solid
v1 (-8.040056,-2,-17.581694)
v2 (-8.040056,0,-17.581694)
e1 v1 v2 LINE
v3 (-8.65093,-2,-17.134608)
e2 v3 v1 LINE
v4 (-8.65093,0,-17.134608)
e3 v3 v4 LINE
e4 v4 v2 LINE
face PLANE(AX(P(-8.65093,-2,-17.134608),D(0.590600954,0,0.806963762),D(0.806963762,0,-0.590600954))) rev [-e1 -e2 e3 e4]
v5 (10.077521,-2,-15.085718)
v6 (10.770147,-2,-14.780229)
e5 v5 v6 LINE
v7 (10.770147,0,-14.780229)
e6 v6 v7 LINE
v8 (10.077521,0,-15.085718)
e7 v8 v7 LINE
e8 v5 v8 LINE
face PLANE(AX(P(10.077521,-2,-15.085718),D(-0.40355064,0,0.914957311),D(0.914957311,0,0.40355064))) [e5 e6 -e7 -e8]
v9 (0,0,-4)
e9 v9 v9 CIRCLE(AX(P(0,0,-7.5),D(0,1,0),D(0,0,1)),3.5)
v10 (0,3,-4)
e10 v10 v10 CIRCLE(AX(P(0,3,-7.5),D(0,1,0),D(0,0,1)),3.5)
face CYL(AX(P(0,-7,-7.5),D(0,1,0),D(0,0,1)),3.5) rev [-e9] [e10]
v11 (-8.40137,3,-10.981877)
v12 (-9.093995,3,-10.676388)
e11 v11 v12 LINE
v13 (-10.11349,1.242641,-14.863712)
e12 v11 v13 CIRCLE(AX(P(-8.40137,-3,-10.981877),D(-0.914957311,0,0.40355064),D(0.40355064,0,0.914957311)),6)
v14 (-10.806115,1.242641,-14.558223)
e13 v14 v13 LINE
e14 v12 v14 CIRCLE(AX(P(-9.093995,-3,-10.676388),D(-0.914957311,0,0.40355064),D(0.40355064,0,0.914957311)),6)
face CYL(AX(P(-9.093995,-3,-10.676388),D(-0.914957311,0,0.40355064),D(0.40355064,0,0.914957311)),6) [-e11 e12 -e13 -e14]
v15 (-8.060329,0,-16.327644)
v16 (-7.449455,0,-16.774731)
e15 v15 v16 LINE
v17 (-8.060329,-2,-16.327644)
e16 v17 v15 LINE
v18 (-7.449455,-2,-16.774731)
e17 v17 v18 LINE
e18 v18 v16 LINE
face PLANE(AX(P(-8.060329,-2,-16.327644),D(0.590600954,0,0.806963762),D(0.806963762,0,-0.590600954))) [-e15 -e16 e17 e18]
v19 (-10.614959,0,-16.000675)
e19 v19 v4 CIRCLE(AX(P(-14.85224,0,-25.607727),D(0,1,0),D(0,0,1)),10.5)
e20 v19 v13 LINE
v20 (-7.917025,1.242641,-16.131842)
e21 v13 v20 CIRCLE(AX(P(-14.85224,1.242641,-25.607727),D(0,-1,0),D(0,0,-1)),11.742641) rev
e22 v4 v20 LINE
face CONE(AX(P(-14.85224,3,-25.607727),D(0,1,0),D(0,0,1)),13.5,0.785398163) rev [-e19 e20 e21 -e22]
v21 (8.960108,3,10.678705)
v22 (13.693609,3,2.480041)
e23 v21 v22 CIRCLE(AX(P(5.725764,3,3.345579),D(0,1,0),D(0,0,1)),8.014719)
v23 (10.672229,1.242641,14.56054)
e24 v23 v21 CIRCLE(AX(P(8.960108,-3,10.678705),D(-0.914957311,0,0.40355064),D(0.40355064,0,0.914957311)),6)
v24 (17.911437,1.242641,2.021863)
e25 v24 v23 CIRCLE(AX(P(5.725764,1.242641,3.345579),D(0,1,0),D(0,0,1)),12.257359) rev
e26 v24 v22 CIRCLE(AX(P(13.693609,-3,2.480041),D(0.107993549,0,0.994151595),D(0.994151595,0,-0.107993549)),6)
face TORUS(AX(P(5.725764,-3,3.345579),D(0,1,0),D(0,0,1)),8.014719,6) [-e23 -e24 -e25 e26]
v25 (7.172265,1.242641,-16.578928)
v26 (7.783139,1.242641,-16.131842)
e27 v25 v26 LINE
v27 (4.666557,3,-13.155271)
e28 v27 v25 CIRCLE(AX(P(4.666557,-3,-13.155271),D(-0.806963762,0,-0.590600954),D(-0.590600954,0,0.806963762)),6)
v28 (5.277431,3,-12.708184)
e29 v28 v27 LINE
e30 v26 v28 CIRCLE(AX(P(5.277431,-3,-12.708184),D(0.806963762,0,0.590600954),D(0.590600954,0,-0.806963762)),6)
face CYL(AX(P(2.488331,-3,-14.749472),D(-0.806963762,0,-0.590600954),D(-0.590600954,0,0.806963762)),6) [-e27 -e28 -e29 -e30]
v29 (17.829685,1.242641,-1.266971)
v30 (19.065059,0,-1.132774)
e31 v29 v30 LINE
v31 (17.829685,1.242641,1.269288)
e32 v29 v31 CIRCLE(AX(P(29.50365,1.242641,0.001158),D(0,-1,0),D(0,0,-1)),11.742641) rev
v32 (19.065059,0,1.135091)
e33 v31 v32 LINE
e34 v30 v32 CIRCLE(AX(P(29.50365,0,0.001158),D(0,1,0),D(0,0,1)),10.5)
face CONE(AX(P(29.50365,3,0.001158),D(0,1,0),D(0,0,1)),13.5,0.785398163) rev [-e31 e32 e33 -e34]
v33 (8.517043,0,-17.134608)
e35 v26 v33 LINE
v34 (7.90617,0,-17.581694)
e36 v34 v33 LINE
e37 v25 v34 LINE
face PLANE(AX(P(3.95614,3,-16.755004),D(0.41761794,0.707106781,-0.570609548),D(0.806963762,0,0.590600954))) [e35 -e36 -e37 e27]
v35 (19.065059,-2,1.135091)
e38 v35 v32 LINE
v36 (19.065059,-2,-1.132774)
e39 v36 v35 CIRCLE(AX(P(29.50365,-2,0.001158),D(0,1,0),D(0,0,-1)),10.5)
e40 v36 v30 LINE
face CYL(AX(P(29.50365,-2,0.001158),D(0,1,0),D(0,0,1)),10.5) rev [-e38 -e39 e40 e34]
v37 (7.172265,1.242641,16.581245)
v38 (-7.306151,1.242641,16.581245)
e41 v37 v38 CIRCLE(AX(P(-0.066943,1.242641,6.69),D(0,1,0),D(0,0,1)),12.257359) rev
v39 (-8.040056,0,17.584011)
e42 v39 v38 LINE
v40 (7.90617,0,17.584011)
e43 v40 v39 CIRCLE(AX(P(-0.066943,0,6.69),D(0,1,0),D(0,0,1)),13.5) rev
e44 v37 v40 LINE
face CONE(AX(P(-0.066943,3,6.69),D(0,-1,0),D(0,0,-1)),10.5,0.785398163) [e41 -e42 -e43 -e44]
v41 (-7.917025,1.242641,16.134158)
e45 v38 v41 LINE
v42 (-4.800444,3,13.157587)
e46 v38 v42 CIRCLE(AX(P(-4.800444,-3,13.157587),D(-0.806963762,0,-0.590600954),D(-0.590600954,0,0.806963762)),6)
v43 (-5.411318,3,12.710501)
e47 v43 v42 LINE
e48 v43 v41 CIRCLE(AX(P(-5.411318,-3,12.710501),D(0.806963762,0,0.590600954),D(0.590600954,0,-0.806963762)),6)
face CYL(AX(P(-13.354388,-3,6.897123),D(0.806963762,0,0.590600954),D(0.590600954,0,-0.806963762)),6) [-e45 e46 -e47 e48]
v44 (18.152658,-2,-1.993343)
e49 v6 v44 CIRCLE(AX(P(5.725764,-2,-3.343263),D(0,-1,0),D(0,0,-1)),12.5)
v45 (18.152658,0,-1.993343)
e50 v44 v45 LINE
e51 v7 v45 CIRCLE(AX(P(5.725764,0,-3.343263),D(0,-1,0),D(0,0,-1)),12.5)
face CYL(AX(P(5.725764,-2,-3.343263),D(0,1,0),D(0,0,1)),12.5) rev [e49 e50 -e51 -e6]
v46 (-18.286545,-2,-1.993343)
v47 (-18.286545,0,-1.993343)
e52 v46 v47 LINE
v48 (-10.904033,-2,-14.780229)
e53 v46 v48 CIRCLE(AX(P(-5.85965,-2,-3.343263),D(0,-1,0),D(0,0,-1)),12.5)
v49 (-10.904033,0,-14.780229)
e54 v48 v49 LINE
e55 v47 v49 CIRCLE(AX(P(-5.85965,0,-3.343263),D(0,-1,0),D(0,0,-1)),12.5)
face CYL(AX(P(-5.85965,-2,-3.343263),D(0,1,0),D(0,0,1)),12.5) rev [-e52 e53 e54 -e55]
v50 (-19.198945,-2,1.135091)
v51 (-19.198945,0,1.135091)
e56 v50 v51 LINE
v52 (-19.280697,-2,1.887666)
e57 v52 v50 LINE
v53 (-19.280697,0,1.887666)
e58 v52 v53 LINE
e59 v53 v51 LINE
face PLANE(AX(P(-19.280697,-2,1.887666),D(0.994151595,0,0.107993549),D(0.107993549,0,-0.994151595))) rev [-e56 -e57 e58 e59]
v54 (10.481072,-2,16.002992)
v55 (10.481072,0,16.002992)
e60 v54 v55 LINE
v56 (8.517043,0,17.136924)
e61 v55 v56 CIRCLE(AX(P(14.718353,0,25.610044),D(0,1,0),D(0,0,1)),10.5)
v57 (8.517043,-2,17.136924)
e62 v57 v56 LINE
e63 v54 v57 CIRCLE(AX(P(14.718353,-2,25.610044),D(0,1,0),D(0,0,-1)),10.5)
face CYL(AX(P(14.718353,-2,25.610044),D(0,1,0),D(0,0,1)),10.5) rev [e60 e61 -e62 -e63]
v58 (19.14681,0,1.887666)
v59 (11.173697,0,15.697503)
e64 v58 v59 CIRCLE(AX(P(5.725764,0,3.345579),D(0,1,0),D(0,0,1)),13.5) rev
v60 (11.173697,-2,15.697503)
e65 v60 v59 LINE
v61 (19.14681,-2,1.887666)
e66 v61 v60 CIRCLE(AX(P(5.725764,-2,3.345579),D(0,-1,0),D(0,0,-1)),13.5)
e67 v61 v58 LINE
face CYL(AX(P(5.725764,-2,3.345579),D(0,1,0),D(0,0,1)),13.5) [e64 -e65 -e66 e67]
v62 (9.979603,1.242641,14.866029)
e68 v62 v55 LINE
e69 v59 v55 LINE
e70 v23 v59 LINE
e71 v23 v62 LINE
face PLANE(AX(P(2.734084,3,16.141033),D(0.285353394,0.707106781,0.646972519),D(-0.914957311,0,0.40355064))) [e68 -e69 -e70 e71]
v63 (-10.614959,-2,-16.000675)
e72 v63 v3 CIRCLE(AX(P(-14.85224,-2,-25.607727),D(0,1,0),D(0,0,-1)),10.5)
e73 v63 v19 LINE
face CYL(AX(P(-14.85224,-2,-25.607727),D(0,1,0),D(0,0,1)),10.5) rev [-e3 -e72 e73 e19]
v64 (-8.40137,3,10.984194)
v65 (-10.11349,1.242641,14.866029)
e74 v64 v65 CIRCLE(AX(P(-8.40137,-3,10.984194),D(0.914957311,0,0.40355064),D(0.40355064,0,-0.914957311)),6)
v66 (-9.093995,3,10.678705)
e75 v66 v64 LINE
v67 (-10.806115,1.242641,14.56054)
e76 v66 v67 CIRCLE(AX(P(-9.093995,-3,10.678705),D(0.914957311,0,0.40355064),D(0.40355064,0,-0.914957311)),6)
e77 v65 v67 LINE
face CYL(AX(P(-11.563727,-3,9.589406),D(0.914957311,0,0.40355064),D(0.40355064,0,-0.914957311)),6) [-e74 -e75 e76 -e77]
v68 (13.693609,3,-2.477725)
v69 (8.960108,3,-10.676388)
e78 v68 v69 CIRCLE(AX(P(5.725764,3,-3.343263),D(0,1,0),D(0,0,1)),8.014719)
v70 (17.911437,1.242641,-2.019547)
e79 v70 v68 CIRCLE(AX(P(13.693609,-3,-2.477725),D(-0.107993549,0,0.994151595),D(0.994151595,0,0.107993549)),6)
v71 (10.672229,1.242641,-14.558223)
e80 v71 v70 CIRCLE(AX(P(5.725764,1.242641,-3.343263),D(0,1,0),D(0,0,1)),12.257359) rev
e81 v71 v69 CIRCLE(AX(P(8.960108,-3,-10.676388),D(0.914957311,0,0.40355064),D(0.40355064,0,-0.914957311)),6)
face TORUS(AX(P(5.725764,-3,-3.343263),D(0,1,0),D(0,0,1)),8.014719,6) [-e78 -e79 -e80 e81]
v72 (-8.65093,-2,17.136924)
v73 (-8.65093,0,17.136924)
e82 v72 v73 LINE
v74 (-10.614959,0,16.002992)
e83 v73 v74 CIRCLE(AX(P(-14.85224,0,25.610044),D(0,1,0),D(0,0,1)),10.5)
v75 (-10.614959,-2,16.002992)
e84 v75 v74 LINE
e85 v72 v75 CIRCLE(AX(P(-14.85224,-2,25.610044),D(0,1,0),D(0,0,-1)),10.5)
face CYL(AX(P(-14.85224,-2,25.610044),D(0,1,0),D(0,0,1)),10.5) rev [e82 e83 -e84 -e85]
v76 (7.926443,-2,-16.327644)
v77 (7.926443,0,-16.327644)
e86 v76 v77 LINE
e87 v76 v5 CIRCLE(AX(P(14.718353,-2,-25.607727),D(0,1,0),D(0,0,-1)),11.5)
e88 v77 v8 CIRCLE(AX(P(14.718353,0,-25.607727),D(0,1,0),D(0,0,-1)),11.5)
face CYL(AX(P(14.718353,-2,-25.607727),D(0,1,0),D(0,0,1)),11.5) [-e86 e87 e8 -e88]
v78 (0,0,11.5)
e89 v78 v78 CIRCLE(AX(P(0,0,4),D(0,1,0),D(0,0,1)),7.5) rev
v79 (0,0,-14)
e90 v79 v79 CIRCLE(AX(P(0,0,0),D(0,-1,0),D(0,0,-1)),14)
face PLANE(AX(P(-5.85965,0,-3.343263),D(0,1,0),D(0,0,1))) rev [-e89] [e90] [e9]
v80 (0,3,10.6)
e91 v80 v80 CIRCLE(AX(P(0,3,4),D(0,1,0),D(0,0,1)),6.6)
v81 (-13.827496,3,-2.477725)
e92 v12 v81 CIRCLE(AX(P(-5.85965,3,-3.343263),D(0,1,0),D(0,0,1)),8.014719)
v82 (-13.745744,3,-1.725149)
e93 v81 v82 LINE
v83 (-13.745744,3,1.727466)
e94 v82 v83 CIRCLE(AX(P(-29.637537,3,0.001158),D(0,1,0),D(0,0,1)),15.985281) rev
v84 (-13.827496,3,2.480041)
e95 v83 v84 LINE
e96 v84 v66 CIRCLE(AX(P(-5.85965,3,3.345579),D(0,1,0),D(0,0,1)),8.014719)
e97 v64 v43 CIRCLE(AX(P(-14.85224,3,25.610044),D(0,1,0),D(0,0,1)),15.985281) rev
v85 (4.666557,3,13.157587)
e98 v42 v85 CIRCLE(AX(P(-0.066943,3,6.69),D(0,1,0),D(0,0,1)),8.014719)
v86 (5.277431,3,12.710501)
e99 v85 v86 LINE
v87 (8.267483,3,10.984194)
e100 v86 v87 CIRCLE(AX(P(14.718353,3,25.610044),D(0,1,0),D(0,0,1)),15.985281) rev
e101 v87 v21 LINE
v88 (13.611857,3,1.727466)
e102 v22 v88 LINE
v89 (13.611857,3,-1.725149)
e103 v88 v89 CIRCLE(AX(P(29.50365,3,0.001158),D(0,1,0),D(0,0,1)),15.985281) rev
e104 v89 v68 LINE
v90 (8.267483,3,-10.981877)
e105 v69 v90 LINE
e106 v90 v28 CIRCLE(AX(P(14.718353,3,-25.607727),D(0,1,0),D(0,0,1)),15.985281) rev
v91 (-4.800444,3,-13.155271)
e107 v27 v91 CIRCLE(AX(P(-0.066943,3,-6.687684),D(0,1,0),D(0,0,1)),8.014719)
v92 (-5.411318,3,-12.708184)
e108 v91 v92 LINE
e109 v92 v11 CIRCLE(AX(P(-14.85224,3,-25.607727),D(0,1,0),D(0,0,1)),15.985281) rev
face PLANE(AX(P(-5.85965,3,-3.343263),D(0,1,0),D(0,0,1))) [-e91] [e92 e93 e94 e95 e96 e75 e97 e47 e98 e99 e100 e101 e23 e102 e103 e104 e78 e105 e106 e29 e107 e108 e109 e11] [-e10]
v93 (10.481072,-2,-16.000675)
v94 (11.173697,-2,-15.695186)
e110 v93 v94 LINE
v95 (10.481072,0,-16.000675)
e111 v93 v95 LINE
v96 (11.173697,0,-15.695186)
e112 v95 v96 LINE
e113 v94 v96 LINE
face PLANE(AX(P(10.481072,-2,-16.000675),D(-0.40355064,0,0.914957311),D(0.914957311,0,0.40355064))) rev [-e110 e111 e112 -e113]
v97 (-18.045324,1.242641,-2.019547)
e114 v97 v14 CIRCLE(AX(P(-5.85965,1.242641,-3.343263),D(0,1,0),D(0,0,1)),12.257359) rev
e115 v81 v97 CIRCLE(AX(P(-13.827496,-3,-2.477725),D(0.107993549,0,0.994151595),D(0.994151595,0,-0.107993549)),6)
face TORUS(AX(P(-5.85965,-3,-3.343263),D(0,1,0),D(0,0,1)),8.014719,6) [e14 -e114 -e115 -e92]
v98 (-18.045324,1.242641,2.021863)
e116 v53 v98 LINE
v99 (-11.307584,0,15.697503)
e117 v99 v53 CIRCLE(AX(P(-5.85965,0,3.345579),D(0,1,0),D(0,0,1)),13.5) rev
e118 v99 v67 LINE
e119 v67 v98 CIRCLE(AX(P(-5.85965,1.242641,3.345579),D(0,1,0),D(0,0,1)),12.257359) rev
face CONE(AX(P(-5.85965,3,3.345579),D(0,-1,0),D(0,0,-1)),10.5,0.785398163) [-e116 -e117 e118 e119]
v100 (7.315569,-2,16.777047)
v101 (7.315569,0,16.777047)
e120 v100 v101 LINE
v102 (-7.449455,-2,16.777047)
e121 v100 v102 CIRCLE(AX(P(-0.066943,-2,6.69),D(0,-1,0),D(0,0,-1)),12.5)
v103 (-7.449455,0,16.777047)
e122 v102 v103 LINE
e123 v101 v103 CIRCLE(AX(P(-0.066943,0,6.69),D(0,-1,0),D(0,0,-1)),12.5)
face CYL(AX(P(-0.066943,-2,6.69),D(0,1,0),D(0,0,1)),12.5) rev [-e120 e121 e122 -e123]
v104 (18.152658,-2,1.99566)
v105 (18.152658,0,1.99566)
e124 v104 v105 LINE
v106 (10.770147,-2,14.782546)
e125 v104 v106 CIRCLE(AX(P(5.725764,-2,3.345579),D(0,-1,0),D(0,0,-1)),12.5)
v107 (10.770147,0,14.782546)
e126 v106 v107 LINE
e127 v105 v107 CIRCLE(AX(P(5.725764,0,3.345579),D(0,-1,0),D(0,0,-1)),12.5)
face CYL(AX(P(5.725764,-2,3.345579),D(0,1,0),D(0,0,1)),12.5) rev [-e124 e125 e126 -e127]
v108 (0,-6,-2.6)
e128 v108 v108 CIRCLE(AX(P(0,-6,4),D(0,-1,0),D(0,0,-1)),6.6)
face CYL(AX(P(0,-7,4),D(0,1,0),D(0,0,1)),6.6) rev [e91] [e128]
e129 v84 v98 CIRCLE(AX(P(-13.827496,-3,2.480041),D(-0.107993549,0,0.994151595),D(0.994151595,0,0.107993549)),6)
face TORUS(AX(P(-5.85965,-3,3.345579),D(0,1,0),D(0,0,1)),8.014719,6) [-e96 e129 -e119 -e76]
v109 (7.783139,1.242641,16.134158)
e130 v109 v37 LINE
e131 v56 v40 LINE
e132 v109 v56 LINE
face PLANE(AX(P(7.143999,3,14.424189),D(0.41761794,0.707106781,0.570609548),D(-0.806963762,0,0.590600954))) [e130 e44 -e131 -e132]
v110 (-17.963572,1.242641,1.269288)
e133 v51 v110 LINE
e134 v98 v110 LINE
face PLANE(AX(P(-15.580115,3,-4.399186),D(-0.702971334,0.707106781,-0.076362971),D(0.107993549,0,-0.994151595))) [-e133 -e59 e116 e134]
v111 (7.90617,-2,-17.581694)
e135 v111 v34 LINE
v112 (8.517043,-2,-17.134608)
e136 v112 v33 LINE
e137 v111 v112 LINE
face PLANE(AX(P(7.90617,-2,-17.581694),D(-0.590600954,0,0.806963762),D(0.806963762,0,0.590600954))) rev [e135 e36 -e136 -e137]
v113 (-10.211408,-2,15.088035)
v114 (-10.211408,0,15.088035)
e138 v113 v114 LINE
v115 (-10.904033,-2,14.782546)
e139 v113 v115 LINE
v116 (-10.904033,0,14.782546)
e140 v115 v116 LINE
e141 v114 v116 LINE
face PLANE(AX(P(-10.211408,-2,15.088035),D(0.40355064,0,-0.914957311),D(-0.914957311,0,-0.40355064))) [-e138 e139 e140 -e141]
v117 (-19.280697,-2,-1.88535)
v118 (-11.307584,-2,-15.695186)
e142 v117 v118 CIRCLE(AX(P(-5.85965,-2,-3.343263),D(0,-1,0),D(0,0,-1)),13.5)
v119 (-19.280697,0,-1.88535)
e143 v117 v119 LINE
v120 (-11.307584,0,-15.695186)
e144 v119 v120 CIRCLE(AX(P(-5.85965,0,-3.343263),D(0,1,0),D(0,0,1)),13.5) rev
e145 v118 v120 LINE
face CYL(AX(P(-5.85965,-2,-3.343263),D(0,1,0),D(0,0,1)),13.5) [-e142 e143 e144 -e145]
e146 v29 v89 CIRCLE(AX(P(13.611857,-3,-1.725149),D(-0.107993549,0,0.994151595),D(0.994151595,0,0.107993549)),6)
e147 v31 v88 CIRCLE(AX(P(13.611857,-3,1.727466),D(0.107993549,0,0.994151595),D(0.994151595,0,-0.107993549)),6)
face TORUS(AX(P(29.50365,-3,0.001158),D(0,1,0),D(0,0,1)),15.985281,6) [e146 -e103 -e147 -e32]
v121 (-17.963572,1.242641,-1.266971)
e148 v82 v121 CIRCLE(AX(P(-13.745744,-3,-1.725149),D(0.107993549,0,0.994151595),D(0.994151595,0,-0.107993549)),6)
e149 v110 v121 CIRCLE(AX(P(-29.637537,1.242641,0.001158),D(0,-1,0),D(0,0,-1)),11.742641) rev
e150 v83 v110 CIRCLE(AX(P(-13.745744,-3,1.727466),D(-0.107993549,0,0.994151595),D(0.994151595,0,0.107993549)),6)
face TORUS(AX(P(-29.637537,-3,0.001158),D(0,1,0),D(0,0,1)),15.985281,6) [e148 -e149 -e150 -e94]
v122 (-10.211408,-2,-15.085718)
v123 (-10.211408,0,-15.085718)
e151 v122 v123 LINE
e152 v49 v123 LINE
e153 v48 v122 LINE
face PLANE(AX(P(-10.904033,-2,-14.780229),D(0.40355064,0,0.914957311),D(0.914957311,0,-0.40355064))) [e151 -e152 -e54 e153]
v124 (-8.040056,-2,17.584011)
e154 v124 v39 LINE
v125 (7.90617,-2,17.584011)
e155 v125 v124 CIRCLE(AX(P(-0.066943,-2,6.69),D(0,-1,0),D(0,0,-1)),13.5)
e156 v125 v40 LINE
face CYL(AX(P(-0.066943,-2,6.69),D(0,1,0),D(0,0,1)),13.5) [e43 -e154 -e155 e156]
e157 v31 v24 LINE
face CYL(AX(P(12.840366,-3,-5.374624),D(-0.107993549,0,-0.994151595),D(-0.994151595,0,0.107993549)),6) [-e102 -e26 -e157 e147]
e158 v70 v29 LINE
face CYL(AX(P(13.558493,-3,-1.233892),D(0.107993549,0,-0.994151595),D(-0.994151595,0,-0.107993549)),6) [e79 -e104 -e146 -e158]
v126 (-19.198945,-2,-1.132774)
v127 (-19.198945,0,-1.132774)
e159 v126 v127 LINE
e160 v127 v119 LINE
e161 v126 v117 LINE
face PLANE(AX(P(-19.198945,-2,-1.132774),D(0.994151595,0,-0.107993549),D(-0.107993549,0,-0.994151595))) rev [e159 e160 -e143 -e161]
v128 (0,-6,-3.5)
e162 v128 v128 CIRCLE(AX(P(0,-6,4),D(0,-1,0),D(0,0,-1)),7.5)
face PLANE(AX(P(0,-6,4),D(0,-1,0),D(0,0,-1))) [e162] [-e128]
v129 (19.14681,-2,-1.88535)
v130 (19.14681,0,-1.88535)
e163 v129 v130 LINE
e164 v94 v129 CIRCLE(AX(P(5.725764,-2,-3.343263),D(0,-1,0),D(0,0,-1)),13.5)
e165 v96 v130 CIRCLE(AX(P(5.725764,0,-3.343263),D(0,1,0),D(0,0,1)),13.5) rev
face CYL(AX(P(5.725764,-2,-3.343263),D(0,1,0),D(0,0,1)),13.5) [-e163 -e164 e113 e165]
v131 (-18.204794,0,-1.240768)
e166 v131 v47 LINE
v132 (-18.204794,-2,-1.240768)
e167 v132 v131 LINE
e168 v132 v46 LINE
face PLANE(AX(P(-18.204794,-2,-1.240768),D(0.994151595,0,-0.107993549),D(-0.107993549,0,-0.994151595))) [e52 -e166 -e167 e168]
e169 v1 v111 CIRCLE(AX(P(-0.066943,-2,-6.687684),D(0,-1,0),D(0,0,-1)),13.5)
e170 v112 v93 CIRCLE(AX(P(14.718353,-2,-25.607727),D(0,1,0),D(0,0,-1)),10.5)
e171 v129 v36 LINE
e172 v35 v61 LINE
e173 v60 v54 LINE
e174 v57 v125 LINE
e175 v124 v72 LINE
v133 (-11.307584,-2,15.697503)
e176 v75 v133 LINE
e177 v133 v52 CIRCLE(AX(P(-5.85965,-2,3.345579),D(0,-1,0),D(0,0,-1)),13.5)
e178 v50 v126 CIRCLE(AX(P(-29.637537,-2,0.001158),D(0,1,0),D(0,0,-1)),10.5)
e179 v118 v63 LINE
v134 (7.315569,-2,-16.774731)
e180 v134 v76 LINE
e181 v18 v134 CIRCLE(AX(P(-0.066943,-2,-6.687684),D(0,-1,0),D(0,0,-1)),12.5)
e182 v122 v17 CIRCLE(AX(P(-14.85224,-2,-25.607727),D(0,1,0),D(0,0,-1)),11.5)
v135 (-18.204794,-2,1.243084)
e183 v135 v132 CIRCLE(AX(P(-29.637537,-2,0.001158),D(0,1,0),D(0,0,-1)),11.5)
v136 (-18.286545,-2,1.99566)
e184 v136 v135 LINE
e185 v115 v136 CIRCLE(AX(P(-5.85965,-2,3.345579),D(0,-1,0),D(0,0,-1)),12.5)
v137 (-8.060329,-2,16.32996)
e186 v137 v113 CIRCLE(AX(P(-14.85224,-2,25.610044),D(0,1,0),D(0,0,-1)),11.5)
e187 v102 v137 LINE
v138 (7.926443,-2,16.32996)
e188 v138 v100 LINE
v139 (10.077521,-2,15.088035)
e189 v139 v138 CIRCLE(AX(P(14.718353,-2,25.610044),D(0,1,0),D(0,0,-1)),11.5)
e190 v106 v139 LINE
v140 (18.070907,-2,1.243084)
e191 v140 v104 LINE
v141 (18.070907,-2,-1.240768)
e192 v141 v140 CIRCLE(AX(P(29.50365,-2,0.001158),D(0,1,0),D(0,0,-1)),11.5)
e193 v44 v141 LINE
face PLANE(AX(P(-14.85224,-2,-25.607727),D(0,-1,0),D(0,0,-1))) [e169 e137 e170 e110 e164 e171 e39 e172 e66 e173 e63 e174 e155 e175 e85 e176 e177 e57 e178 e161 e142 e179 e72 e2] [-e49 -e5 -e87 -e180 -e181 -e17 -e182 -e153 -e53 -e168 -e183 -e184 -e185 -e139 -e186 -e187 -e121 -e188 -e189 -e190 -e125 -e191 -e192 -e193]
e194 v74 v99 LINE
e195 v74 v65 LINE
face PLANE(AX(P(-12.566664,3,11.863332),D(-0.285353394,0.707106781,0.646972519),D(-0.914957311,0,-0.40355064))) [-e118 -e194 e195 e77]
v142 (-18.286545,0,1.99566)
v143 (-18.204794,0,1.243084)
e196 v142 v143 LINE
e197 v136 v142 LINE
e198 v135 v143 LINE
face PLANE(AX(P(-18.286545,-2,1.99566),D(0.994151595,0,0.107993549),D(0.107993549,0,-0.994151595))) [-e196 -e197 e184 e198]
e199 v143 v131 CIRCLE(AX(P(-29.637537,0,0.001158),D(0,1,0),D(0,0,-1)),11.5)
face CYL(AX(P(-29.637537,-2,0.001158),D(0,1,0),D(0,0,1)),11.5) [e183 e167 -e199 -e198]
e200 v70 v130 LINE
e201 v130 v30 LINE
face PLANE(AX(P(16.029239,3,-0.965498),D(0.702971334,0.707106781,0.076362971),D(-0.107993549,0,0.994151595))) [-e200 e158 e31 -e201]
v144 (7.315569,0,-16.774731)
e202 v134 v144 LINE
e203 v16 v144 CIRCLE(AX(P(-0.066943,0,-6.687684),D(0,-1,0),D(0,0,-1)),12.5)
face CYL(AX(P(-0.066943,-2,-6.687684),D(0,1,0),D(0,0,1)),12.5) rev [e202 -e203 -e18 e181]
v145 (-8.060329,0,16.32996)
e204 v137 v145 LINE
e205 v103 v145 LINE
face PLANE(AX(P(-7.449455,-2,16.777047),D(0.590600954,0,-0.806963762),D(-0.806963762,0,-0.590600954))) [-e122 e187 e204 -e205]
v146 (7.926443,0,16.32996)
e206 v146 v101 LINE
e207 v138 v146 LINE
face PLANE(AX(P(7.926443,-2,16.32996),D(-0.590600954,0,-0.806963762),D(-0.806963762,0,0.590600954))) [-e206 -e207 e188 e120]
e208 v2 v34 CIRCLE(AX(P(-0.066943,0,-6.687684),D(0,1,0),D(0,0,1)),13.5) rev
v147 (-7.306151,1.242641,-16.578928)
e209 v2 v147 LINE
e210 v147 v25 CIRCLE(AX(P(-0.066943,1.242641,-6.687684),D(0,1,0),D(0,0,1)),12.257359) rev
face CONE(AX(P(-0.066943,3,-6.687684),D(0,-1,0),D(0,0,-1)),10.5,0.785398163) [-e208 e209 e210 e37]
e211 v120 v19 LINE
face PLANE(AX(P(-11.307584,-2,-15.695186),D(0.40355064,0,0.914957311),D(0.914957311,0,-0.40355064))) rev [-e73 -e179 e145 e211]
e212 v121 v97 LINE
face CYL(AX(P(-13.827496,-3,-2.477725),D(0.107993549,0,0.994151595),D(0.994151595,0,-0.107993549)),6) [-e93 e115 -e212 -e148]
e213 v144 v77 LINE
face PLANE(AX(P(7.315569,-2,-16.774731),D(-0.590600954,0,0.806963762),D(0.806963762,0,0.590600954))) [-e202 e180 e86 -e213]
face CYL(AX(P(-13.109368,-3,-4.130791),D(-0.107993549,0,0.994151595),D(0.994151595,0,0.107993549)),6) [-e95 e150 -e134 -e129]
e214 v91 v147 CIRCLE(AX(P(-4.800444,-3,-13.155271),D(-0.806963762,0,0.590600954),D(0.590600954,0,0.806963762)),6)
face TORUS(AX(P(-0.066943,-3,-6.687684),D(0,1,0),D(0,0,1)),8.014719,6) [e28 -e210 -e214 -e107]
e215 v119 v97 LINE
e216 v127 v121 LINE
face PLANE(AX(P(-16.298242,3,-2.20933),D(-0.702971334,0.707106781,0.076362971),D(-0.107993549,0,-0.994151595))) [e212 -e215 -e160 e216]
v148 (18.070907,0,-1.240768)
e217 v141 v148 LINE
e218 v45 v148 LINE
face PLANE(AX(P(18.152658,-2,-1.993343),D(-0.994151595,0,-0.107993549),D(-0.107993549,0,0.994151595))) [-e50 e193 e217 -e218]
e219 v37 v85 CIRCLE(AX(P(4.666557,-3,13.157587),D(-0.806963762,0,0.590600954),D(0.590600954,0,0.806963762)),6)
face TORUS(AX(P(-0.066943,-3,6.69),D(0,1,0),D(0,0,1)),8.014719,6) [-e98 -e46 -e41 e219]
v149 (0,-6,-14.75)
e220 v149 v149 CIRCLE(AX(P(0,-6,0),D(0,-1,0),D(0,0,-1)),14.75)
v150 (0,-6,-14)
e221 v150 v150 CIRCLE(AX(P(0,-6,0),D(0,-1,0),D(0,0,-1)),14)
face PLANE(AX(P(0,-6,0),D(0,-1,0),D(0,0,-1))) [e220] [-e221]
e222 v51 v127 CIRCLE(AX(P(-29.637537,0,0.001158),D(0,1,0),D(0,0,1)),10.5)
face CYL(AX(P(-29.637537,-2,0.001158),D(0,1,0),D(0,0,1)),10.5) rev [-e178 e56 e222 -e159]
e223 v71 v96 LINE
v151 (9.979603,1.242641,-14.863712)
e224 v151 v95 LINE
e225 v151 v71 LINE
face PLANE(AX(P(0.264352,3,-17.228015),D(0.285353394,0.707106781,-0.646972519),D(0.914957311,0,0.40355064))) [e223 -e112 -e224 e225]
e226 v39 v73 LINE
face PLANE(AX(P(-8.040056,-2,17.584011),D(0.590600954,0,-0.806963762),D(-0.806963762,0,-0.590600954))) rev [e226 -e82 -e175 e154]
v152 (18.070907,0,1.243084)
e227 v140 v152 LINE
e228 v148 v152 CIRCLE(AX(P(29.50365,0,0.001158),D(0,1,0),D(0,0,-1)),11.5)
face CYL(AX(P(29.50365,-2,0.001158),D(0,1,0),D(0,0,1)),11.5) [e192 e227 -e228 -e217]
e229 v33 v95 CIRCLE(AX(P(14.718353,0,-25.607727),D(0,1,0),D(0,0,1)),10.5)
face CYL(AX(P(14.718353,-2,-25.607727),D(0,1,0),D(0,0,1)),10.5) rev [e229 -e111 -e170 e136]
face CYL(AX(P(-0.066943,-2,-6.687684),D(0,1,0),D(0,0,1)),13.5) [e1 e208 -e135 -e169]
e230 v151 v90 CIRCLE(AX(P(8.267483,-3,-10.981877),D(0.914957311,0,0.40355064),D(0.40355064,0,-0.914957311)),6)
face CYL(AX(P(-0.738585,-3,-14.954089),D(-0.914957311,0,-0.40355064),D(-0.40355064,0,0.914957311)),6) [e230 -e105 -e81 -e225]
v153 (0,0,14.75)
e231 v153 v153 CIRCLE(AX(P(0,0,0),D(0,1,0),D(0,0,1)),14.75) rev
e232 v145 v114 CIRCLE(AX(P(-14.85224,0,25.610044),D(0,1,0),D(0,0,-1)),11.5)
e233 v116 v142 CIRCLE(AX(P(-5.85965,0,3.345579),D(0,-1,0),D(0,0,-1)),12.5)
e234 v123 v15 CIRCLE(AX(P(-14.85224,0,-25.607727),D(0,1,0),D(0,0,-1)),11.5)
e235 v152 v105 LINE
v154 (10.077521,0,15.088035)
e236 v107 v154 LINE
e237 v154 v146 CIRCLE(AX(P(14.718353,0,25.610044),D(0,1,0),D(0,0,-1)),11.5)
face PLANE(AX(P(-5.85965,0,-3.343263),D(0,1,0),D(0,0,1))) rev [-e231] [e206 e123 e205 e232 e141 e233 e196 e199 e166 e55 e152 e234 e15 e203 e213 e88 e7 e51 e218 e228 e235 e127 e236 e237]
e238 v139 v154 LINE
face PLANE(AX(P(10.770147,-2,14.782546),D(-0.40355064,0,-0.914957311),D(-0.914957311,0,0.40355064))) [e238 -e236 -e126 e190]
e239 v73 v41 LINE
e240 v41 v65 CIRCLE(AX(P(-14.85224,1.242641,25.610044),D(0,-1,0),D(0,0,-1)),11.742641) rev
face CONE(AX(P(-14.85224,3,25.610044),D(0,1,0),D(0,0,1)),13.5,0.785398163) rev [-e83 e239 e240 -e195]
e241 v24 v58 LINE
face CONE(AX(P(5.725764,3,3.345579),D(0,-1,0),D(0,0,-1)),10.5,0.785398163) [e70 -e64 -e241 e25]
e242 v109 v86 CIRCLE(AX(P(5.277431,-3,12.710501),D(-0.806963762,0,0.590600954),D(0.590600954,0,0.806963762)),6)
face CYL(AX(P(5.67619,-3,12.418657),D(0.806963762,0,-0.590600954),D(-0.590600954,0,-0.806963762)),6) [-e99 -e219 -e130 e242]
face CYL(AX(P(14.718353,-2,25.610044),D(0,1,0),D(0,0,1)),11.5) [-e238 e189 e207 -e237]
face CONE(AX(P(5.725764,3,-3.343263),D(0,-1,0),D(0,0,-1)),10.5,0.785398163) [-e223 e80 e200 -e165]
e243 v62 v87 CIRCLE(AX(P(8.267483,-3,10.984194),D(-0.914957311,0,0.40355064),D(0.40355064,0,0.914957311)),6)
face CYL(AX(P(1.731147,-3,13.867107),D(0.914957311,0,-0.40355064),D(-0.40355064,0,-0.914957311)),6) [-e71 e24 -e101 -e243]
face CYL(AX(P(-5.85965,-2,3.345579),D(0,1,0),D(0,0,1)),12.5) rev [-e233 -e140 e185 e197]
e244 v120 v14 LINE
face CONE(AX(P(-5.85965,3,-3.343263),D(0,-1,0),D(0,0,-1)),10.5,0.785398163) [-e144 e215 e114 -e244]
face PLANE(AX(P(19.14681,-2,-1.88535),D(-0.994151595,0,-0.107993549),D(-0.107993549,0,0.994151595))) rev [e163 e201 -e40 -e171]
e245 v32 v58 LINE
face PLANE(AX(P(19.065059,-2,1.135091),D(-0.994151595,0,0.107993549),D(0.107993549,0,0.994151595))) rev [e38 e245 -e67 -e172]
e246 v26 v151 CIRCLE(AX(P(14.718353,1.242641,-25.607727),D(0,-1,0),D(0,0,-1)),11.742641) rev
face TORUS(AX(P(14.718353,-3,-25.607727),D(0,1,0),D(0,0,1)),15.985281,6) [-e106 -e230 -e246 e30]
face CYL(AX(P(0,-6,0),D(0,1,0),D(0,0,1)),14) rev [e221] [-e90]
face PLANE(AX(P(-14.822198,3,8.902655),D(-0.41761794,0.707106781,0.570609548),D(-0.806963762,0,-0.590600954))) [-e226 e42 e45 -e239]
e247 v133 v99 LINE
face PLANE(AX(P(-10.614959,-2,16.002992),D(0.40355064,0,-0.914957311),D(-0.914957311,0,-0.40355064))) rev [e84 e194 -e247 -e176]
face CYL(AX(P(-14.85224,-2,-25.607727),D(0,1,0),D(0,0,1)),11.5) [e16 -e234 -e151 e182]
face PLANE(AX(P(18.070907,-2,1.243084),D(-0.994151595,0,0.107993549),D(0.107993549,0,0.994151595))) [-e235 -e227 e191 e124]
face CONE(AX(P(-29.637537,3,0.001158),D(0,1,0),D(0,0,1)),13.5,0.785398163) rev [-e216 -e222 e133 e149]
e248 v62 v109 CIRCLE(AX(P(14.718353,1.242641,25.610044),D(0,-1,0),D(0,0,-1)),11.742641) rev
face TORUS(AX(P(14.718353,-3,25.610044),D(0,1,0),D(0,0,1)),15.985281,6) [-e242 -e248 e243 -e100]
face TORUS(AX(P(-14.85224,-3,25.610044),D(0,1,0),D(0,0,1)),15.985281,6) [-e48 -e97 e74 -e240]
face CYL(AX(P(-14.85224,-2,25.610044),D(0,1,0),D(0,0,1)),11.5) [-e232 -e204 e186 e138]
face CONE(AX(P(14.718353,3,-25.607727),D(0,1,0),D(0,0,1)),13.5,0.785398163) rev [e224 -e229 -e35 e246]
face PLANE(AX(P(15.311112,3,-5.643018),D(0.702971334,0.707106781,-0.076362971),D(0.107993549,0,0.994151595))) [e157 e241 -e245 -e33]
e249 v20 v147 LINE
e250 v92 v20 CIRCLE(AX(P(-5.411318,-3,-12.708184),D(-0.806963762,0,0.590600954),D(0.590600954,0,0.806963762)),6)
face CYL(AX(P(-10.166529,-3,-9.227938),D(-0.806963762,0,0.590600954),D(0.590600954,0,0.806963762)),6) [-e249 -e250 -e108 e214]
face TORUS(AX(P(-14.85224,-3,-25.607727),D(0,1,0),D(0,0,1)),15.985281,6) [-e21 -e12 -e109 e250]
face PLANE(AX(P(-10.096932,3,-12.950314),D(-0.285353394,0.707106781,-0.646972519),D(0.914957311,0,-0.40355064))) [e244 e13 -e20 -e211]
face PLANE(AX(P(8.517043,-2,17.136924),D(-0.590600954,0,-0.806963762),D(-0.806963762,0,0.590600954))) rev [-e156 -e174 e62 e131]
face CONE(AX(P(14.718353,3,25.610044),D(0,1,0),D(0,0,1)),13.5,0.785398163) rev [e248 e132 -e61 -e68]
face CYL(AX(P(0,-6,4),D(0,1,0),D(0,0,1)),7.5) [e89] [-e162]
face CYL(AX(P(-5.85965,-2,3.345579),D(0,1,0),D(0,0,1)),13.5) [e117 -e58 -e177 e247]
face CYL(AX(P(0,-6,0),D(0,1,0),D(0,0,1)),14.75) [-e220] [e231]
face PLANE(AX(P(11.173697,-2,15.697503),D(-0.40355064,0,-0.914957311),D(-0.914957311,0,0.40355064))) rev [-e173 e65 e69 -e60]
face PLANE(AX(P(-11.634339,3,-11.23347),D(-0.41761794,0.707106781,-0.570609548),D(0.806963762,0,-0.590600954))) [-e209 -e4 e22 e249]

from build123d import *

# Parameters (mm, degrees)
EXTRUDE_1_DEPTH     = 3
CHAMFER_1_SIZE      = 4.5
SKETCH_3_R          = 14.75
SKETCH_3_R_2        = 14
EXTRUDE_2_DEPTH     = 6
FILLET_1_R          = 6
SKETCH_4_R          = 6.6
SKETCH_4_R_2        = 3.5
CUT_EXTRUDE_1_DEPTH = 10
SKETCH_5_R          = 7.5
SKETCH_5_R_2        = 6.6
EXTRUDE_3_DEPTH     = 6
EXTRUDE_4_DEPTH     = 2


with BuildPart() as part:
    # 草圖1 → 填料-伸長1 (new body)
    with BuildSketch(Plane(origin=(0, 0, 0), x_dir=(1, 0, 0), z_dir=(0, 1, 0))):
        with BuildLine():
            Line((-20.771924176, 1.723359404), (-20.69017274, 0.970783701))
            ThreePointArc((-20.69017274, 0.970783701), (-20.637537093, -0.00115824), (-20.69017274, -0.973100181))
            Line((-20.69017274, -0.973100181), (-20.771924176, -1.725675885))
            ThreePointArc((-20.771924176, -1.725675885), (-18.850031312, -10.84557912), (-11.912909862, -17.069938782))
            Line((-11.912909862, -17.069938782), (-11.220284466, -17.375427813))
            ThreePointArc((-11.220284466, -17.375427813), (-10.352240231, -17.815814976), (-9.536831642, -18.347369754))
            Line((-9.536831642, -18.347369754), (-8.925957683, -18.794456427))
            ThreePointArc((-8.925957683, -18.794456427), (-0.066943369, -21.69), (8.792070945, -18.794456427))
            Line((8.792070945, -18.794456427), (9.402944904, -18.347369754))
            ThreePointArc((9.402944904, -18.347369754), (10.218353493, -17.815814976), (11.086397728, -17.375427813))
            Line((11.086397728, -17.375427813), (11.779023124, -17.069938782))
            ThreePointArc((11.779023124, -17.069938782), (18.716144574, -10.84557912), (20.638037438, -1.725675885))
            Line((20.638037438, -1.725675885), (20.556286002, -0.973100181))
            ThreePointArc((20.556286002, -0.973100181), (20.503650354, -0.00115824), (20.556286002, 0.970783701))
            Line((20.556286002, 0.970783701), (20.638037438, 1.723359404))
            ThreePointArc((20.638037438, 1.723359404), (18.716144574, 10.84326264), (11.779023124, 17.067622301))
            Line((11.779023124, 17.067622301), (11.086397728, 17.373111332))
            ThreePointArc((11.086397728, 17.373111332), (10.218353493, 17.813498495), (9.402944904, 18.345053273))
            Line((9.402944904, 18.345053273), (8.792070945, 18.792139946))
            ThreePointArc((8.792070945, 18.792139946), (-0.066943369, 21.68768352), (-8.925957683, 18.792139946))
            Line((-8.925957683, 18.792139946), (-9.536831642, 18.345053273))
            ThreePointArc((-9.536831642, 18.345053273), (-10.352240231, 17.813498495), (-11.220284466, 17.373111332))
            Line((-11.220284466, 17.373111332), (-11.912909862, 17.067622301))
            ThreePointArc((-11.912909862, 17.067622301), (-18.850031312, 10.84326264), (-20.771924176, 1.723359404))
        make_face()
    extrude(amount=EXTRUDE_1_DEPTH)

    # 導角1
    # the kernel refuses this chamfer: 4.5 mm, written as the material it takes off along each edge
    with BuildSketch(Plane(origin=(-0.066943369, 3, -6.68768352), x_dir=(0.5906009542707505, 0, -0.8069637617727817), z_dir=(0.8069637617727817, 0, 0.5906009542707505))) as chamfer_1_piece_1:
        Polygon((15, -CHAMFER_1_SIZE), (15 - CHAMFER_1_SIZE, 0), (15, 0), align=None)
    revolve(axis=Axis((-0.066943369, 3, -6.68768352), (0, 1, 0)), revolution_arc=72.399330687, mode=Mode.SUBTRACT)
    with BuildSketch(Plane(origin=(-8.925957683, 3, -18.792139946), x_dir=(-0.01623909096472269, -0.9996219169112969, -0.022188176022919184), z_dir=(-0.8069637617727913, 0, 0.5906009542707374)), Plane(origin=(9.402944904, 3, -18.345053273), x_dir=(0.01623909096472324, -0.9996219169112966, -0.02218817602291905), z_dir=(-0.8069637617727801, 0, -0.590600954270753)), Plane(origin=(-11.220284466, 3, -17.373111332), x_dir=(-0.011095978617127454, -0.9996219169112966, -0.025157553321276054), z_dir=(-0.9149573107841873, 0, 0.4035506404933192)), Plane(origin=(11.779023124, 3, -17.067622301), x_dir=(0.011095978617127486, -0.9996219169112966, -0.02515755332127604), z_dir=(-0.9149573107841869, 0, -0.4035506404933204)), Plane(origin=(-20.771924176, 3, -1.723359404), x_dir=(-0.027335069581850155, -0.9996219169112966, 0.002969377298356594), z_dir=(0.10799354901139412, 0, 0.9941515947640599)), Plane(origin=(20.556286002, 3, -0.970783701), x_dir=(0.027335069581850155, -0.9996219169112966, 0.0029693772983568475), z_dir=(0.10799354901140323, 0, -0.994151594764059)), Plane(origin=(-20.69017274, 3, 0.973100181), x_dir=(-0.027335069581850155, -0.9996219169112966, -0.002969377298358358), z_dir=(-0.10799354901145754, 0, 0.994151594764053)), Plane(origin=(20.638037438, 3, 1.725675885), x_dir=(0.027335069581850155, -0.9996219169112966, -0.0029693772983564425), z_dir=(-0.10799354901138868, 0, -0.9941515947640606)), Plane(origin=(-11.912909862, 3, 17.069938782), x_dir=(-0.011095978617125555, -0.9996219169112966, 0.025157553321276813), z_dir=(0.9149573107842173, 0, 0.4035506404932512)), Plane(origin=(11.086397728, 3, 17.375427813), x_dir=(0.011095978617127088, -0.9996219169112966, 0.025157553321276047), z_dir=(0.9149573107841922, 0, -0.40355064049330813)), Plane(origin=(-9.536831642, 3, 18.347369754), x_dir=(-0.016239090964723223, -0.9996219169112966, 0.022188176022919063), z_dir=(0.8069637617727805, 0, 0.5906009542707523)), Plane(origin=(8.792070945, 3, 18.794456427), x_dir=(0.016239090964722667, -0.9996219169112969, 0.022188176022919195), z_dir=(0.8069637617727918, 0, -0.5906009542707369))) as chamfer_1_piece_2:
        Polygon((CHAMFER_1_SIZE * 0.999621916911, CHAMFER_1_SIZE * 0.0274958766106), (-CHAMFER_1_SIZE * 0.0274958766106, CHAMFER_1_SIZE * 0.999621916911), (0, 0), align=None)
    extrude(amount=0.757002964, mode=Mode.SUBTRACT)
    with BuildSketch(Plane(origin=(-14.852240231, 3, -25.607727129), x_dir=(0.5906009542707428, 0, 0.8069637617727874), z_dir=(0.8069637617727874, 0, -0.5906009542707428))) as chamfer_1_piece_3:
        Polygon((9, CHAMFER_1_SIZE), (9 + CHAMFER_1_SIZE, 0), (9, 0), align=None)
    revolve(axis=Axis((-14.852240231, 3, -25.607727129), (0, -1, 0)), revolution_arc=12.399330687, mode=Mode.SUBTRACT)
    with BuildSketch(Plane(origin=(14.718353493, 3, -25.607727129), x_dir=(-0.4035506404933155, 0, 0.9149573107841887), z_dir=(0.9149573107841887, 0, 0.4035506404933155))) as chamfer_1_piece_4:
        Polygon((9, CHAMFER_1_SIZE), (9 + CHAMFER_1_SIZE, 0), (9, 0), align=None)
    revolve(axis=Axis((14.718353493, 3, -25.607727129), (0, -1, 0)), revolution_arc=12.399330687, mode=Mode.SUBTRACT)
    with BuildSketch(Plane(origin=(-5.859650255, 3, -3.34326264), x_dir=(-0.4035506404933193, 0, -0.9149573107841873), z_dir=(0.9149573107841873, 0, -0.4035506404933193))) as chamfer_1_piece_5:
        Polygon((15, -CHAMFER_1_SIZE), (15 - CHAMFER_1_SIZE, 0), (15, 0), align=None)
    revolve(axis=Axis((-5.859650255, 3, -3.34326264), (0, 1, 0)), revolution_arc=72.399330687, mode=Mode.SUBTRACT)
    with BuildSketch(Plane(origin=(5.725763517, 3, -3.34326264), x_dir=(0.9941515947640591, 0, 0.10799354901140142), z_dir=(-0.10799354901140142, 0, 0.9941515947640591))) as chamfer_1_piece_6:
        Polygon((15, -CHAMFER_1_SIZE), (15 - CHAMFER_1_SIZE, 0), (15, 0), align=None)
    revolve(axis=Axis((5.725763517, 3, -3.34326264), (0, 1, 0)), revolution_arc=72.399330687, mode=Mode.SUBTRACT)
    with BuildSketch(Plane(origin=(-29.637537093, 3, 0.00115824), x_dir=(0.9941515947640589, 0, -0.10799354901140375), z_dir=(-0.10799354901140375, 0, -0.9941515947640589))) as chamfer_1_piece_7:
        Polygon((9, CHAMFER_1_SIZE), (9 + CHAMFER_1_SIZE, 0), (9, 0), align=None)
    revolve(axis=Axis((-29.637537093, 3, 0.00115824), (0, -1, 0)), revolution_arc=12.399330687, mode=Mode.SUBTRACT)
    with BuildSketch(Plane(origin=(29.503650354, 3, 0.00115824), x_dir=(-0.9941515947640608, 0, 0.1079935490113869), z_dir=(0.1079935490113869, 0, 0.9941515947640608))) as chamfer_1_piece_8:
        Polygon((9, CHAMFER_1_SIZE), (9 + CHAMFER_1_SIZE, 0), (9, 0), align=None)
    revolve(axis=Axis((29.503650354, 3, 0.00115824), (0, -1, 0)), revolution_arc=12.399330687, mode=Mode.SUBTRACT)
    with BuildSketch(Plane(origin=(-5.859650255, 3, 3.34557912), x_dir=(-0.994151594764053, 0, -0.10799354901145736), z_dir=(0.10799354901145736, 0, -0.994151594764053))) as chamfer_1_piece_9:
        Polygon((15, -CHAMFER_1_SIZE), (15 - CHAMFER_1_SIZE, 0), (15, 0), align=None)
    revolve(axis=Axis((-5.859650255, 3, 3.34557912), (0, 1, 0)), revolution_arc=72.399330687, mode=Mode.SUBTRACT)
    with BuildSketch(Plane(origin=(5.725763517, 3, 3.34557912), x_dir=(0.4035506404933145, 0, 0.9149573107841893), z_dir=(-0.9149573107841893, 0, 0.4035506404933145))) as chamfer_1_piece_10:
        Polygon((15, -CHAMFER_1_SIZE), (15 - CHAMFER_1_SIZE, 0), (15, 0), align=None)
    revolve(axis=Axis((5.725763517, 3, 3.34557912), (0, 1, 0)), revolution_arc=72.399330687, mode=Mode.SUBTRACT)
    with BuildSketch(Plane(origin=(-14.852240231, 3, 25.61004361), x_dir=(0.4035506404932408, 0, -0.9149573107842218), z_dir=(-0.9149573107842218, 0, -0.4035506404932408))) as chamfer_1_piece_11:
        Polygon((9, CHAMFER_1_SIZE), (9 + CHAMFER_1_SIZE, 0), (9, 0), align=None)
    revolve(axis=Axis((-14.852240231, 3, 25.61004361), (0, -1, 0)), revolution_arc=12.399330687, mode=Mode.SUBTRACT)
    with BuildSketch(Plane(origin=(14.718353493, 3, 25.61004361), x_dir=(-0.5906009542707262, 0, -0.8069637617727996), z_dir=(-0.8069637617727996, 0, 0.5906009542707262))) as chamfer_1_piece_12:
        Polygon((9, CHAMFER_1_SIZE), (9 + CHAMFER_1_SIZE, 0), (9, 0), align=None)
    revolve(axis=Axis((14.718353493, 3, 25.61004361), (0, -1, 0)), revolution_arc=12.399330687, mode=Mode.SUBTRACT)
    with BuildSketch(Plane(origin=(-0.066943369, 3, 6.69), x_dir=(-0.5906009542707477, 0, 0.8069637617727838), z_dir=(-0.8069637617727838, 0, -0.5906009542707477))) as chamfer_1_piece_13:
        Polygon((15, -CHAMFER_1_SIZE), (15 - CHAMFER_1_SIZE, 0), (15, 0), align=None)
    revolve(axis=Axis((-0.066943369, 3, 6.69), (0, 1, 0)), revolution_arc=72.399330687, mode=Mode.SUBTRACT)

    # 草圖3 → 填料-伸長2 (add)
    with BuildSketch(Plane.XZ):
        with Locations(Location((0, 0, 0), (0, 0, 90))):
            Circle(SKETCH_3_R)
        with Locations(Location((0, 0, 0), (0, 0, 270))):
            Circle(SKETCH_3_R_2, mode=Mode.SUBTRACT)
    extrude(amount=EXTRUDE_2_DEPTH)

    # 圓角1
    fillet_1_edges = [part.edges().sort_by_distance(p)[0] for p in [
        (-0.066943369, 3, 17.19),
        (6.43980363, 3, 14.939576162),
        (-6.573690369, 3, 14.939576162),
        (7.968353493, 3, 13.918700659),
        (-8.102240231, 3, 13.918700659),
        (9.616732544, 3, 13.105375399),
        (-9.750619282, 3, 13.105375399),
        (14.819030257, 3, 8.59557912),
        (-14.952916995, 3, 8.59557912),
        (16.123479543, 3, 1.835359004),
        (-16.257366282, 3, 1.835359004),
        (16.003650354, 3, 0.00115824),
        (-16.137537093, 3, 0.00115824),
        (16.123479543, 3, -1.833042523),
        (-16.257366282, 3, -1.833042523),
        (14.819030257, 3, -8.59326264),
        (-14.952916995, 3, -8.59326264),
        (9.616732544, 3, -13.103058918),
        (-9.750619282, 3, -13.103058918),
        (7.968353493, 3, -13.916384178),
        (-8.102240231, 3, -13.916384178),
        (6.43980363, 3, -14.937259682),
        (-6.573690369, 3, -14.937259682),
        (-0.066943369, 3, -17.18768352),
    ]]
    fillet(fillet_1_edges, radius=FILLET_1_R)

    # 草圖4 → 除料-伸長1 (cut)
    with BuildSketch(Plane(origin=(0, 3, 0), x_dir=(1, 0, 0), z_dir=(0, 1, 0))):
        with Locations(Location((0, -4, 0), (0, 0, 270))):
            Circle(SKETCH_4_R)
        with Locations(Location((0, 7.5, 0), (0, 0, 270))):
            Circle(SKETCH_4_R_2)
    extrude(amount=-CUT_EXTRUDE_1_DEPTH, mode=Mode.SUBTRACT)

    # 草圖5 → 填料-伸長3 (add)
    with BuildSketch(Plane.XZ):
        with Locations(Location((0, 4, 0), (0, 0, 90))):
            Circle(SKETCH_5_R)
        with Locations(Location((0, 4, 0), (0, 0, 90))):
            Circle(SKETCH_5_R_2, mode=Mode.SUBTRACT)
    extrude(amount=EXTRUDE_3_DEPTH)

    # 草圖6 → 填料-伸長4 (add)
    with BuildSketch(Plane.XZ):
        with BuildLine():
            Line((-8.650930211, -17.134607631), (-8.040056252, -17.581694303))
            ThreePointArc((-8.040056252, -17.581694303), (-0.066943369, -20.18768352), (7.906169514, -17.581694303))
            Line((7.906169514, -17.581694303), (8.517043473, -17.134607631))
            ThreePointArc((8.517043473, -17.134607631), (9.468353493, -16.51446039), (10.481071768, -16.000675366))
            Line((10.481071768, -16.000675366), (11.173697163, -15.695186335))
            ThreePointArc((11.173697163, -15.695186335), (17.417106468, -10.09326264), (19.146810046, -1.885349728))
            Line((19.146810046, -1.885349728), (19.065058609, -1.132774024))
            ThreePointArc((19.065058609, -1.132774024), (19.003650354, 0.00115824), (19.065058609, 1.135090505))
            Line((19.065058609, 1.135090505), (19.146810046, 1.887666208))
            ThreePointArc((19.146810046, 1.887666208), (17.417106468, 10.09557912), (11.173697163, 15.697502816))
            Line((11.173697163, 15.697502816), (10.481071768, 16.002991847))
            ThreePointArc((10.481071768, 16.002991847), (9.468353493, 16.51677687), (8.517043473, 17.136924111))
            Line((8.517043473, 17.136924111), (7.906169514, 17.584010784))
            ThreePointArc((7.906169514, 17.584010784), (-0.066943369, 20.19), (-8.040056252, 17.584010784))
            Line((-8.040056252, 17.584010784), (-8.650930211, 17.136924111))
            ThreePointArc((-8.650930211, 17.136924111), (-9.602240231, 16.51677687), (-10.614958506, 16.002991847))
            Line((-10.614958506, 16.002991847), (-11.307583902, 15.697502816))
            ThreePointArc((-11.307583902, 15.697502816), (-17.550993206, 10.09557912), (-19.280696784, 1.887666208))
            Line((-19.280696784, 1.887666208), (-19.198945348, 1.135090505))
            ThreePointArc((-19.198945348, 1.135090505), (-19.137537093, 0.00115824), (-19.198945348, -1.132774024))
            Line((-19.198945348, -1.132774024), (-19.280696784, -1.885349728))
            ThreePointArc((-19.280696784, -1.885349728), (-17.550993206, -10.09326264), (-11.307583902, -15.695186335))
            Line((-11.307583902, -15.695186335), (-10.614958506, -16.000675366))
            ThreePointArc((-10.614958506, -16.000675366), (-9.602240231, -16.51446039), (-8.650930211, -17.134607631))
        make_face()
        with BuildLine():
            Line((-8.060329257, -16.327643869), (-7.449455297, -16.774730542))
            ThreePointArc((-7.449455297, -16.774730542), (-0.066943369, -19.18768352), (7.315568559, -16.774730542))
            Line((7.315568559, -16.774730542), (7.926442519, -16.327643869))
            ThreePointArc((7.926442519, -16.327643869), (8.968353493, -15.648434986), (10.077521127, -15.085718055))
            Line((10.077521127, -15.085718055), (10.770146523, -14.780229024))
            ThreePointArc((10.770146523, -14.780229024), (16.551081064, -9.59326264), (18.152658451, -1.993343277))
            Line((18.152658451, -1.993343277), (18.070907015, -1.240767573))
            ThreePointArc((18.070907015, -1.240767573), (18.003650354, 0.00115824), (18.070907015, 1.243084054))
            Line((18.070907015, 1.243084054), (18.152658451, 1.995659757))
            ThreePointArc((18.152658451, 1.995659757), (16.551081064, 9.59557912), (10.770146523, 14.782545505))
            Line((10.770146523, 14.782545505), (10.077521127, 15.088034536))
            ThreePointArc((10.077521127, 15.088034536), (8.968353493, 15.650751466), (7.926442519, 16.329960349))
            Line((7.926442519, 16.329960349), (7.315568559, 16.777047022))
            ThreePointArc((7.315568559, 16.777047022), (-0.066943369, 19.19), (-7.449455297, 16.777047022))
            Line((-7.449455297, 16.777047022), (-8.060329257, 16.329960349))
            ThreePointArc((-8.060329257, 16.329960349), (-9.102240231, 15.650751466), (-10.211407865, 15.088034536))
            Line((-10.211407865, 15.088034536), (-10.904033261, 14.782545505))
            ThreePointArc((-10.904033261, 14.782545505), (-16.684967802, 9.59557912), (-18.286545189, 1.995659757))
            Line((-18.286545189, 1.995659757), (-18.204793753, 1.243084054))
            ThreePointArc((-18.204793753, 1.243084054), (-18.137537093, 0.00115824), (-18.204793753, -1.240767573))
            Line((-18.204793753, -1.240767573), (-18.286545189, -1.993343277))
            ThreePointArc((-18.286545189, -1.993343277), (-16.684967802, -9.59326264), (-10.904033261, -14.780229024))
            Line((-10.904033261, -14.780229024), (-10.211407865, -15.085718055))
            ThreePointArc((-10.211407865, -15.085718055), (-9.102240231, -15.648434986), (-8.060329257, -16.327643869))
        make_face(mode=Mode.SUBTRACT)
    extrude(amount=EXTRUDE_4_DEPTH)


solid = part.part
